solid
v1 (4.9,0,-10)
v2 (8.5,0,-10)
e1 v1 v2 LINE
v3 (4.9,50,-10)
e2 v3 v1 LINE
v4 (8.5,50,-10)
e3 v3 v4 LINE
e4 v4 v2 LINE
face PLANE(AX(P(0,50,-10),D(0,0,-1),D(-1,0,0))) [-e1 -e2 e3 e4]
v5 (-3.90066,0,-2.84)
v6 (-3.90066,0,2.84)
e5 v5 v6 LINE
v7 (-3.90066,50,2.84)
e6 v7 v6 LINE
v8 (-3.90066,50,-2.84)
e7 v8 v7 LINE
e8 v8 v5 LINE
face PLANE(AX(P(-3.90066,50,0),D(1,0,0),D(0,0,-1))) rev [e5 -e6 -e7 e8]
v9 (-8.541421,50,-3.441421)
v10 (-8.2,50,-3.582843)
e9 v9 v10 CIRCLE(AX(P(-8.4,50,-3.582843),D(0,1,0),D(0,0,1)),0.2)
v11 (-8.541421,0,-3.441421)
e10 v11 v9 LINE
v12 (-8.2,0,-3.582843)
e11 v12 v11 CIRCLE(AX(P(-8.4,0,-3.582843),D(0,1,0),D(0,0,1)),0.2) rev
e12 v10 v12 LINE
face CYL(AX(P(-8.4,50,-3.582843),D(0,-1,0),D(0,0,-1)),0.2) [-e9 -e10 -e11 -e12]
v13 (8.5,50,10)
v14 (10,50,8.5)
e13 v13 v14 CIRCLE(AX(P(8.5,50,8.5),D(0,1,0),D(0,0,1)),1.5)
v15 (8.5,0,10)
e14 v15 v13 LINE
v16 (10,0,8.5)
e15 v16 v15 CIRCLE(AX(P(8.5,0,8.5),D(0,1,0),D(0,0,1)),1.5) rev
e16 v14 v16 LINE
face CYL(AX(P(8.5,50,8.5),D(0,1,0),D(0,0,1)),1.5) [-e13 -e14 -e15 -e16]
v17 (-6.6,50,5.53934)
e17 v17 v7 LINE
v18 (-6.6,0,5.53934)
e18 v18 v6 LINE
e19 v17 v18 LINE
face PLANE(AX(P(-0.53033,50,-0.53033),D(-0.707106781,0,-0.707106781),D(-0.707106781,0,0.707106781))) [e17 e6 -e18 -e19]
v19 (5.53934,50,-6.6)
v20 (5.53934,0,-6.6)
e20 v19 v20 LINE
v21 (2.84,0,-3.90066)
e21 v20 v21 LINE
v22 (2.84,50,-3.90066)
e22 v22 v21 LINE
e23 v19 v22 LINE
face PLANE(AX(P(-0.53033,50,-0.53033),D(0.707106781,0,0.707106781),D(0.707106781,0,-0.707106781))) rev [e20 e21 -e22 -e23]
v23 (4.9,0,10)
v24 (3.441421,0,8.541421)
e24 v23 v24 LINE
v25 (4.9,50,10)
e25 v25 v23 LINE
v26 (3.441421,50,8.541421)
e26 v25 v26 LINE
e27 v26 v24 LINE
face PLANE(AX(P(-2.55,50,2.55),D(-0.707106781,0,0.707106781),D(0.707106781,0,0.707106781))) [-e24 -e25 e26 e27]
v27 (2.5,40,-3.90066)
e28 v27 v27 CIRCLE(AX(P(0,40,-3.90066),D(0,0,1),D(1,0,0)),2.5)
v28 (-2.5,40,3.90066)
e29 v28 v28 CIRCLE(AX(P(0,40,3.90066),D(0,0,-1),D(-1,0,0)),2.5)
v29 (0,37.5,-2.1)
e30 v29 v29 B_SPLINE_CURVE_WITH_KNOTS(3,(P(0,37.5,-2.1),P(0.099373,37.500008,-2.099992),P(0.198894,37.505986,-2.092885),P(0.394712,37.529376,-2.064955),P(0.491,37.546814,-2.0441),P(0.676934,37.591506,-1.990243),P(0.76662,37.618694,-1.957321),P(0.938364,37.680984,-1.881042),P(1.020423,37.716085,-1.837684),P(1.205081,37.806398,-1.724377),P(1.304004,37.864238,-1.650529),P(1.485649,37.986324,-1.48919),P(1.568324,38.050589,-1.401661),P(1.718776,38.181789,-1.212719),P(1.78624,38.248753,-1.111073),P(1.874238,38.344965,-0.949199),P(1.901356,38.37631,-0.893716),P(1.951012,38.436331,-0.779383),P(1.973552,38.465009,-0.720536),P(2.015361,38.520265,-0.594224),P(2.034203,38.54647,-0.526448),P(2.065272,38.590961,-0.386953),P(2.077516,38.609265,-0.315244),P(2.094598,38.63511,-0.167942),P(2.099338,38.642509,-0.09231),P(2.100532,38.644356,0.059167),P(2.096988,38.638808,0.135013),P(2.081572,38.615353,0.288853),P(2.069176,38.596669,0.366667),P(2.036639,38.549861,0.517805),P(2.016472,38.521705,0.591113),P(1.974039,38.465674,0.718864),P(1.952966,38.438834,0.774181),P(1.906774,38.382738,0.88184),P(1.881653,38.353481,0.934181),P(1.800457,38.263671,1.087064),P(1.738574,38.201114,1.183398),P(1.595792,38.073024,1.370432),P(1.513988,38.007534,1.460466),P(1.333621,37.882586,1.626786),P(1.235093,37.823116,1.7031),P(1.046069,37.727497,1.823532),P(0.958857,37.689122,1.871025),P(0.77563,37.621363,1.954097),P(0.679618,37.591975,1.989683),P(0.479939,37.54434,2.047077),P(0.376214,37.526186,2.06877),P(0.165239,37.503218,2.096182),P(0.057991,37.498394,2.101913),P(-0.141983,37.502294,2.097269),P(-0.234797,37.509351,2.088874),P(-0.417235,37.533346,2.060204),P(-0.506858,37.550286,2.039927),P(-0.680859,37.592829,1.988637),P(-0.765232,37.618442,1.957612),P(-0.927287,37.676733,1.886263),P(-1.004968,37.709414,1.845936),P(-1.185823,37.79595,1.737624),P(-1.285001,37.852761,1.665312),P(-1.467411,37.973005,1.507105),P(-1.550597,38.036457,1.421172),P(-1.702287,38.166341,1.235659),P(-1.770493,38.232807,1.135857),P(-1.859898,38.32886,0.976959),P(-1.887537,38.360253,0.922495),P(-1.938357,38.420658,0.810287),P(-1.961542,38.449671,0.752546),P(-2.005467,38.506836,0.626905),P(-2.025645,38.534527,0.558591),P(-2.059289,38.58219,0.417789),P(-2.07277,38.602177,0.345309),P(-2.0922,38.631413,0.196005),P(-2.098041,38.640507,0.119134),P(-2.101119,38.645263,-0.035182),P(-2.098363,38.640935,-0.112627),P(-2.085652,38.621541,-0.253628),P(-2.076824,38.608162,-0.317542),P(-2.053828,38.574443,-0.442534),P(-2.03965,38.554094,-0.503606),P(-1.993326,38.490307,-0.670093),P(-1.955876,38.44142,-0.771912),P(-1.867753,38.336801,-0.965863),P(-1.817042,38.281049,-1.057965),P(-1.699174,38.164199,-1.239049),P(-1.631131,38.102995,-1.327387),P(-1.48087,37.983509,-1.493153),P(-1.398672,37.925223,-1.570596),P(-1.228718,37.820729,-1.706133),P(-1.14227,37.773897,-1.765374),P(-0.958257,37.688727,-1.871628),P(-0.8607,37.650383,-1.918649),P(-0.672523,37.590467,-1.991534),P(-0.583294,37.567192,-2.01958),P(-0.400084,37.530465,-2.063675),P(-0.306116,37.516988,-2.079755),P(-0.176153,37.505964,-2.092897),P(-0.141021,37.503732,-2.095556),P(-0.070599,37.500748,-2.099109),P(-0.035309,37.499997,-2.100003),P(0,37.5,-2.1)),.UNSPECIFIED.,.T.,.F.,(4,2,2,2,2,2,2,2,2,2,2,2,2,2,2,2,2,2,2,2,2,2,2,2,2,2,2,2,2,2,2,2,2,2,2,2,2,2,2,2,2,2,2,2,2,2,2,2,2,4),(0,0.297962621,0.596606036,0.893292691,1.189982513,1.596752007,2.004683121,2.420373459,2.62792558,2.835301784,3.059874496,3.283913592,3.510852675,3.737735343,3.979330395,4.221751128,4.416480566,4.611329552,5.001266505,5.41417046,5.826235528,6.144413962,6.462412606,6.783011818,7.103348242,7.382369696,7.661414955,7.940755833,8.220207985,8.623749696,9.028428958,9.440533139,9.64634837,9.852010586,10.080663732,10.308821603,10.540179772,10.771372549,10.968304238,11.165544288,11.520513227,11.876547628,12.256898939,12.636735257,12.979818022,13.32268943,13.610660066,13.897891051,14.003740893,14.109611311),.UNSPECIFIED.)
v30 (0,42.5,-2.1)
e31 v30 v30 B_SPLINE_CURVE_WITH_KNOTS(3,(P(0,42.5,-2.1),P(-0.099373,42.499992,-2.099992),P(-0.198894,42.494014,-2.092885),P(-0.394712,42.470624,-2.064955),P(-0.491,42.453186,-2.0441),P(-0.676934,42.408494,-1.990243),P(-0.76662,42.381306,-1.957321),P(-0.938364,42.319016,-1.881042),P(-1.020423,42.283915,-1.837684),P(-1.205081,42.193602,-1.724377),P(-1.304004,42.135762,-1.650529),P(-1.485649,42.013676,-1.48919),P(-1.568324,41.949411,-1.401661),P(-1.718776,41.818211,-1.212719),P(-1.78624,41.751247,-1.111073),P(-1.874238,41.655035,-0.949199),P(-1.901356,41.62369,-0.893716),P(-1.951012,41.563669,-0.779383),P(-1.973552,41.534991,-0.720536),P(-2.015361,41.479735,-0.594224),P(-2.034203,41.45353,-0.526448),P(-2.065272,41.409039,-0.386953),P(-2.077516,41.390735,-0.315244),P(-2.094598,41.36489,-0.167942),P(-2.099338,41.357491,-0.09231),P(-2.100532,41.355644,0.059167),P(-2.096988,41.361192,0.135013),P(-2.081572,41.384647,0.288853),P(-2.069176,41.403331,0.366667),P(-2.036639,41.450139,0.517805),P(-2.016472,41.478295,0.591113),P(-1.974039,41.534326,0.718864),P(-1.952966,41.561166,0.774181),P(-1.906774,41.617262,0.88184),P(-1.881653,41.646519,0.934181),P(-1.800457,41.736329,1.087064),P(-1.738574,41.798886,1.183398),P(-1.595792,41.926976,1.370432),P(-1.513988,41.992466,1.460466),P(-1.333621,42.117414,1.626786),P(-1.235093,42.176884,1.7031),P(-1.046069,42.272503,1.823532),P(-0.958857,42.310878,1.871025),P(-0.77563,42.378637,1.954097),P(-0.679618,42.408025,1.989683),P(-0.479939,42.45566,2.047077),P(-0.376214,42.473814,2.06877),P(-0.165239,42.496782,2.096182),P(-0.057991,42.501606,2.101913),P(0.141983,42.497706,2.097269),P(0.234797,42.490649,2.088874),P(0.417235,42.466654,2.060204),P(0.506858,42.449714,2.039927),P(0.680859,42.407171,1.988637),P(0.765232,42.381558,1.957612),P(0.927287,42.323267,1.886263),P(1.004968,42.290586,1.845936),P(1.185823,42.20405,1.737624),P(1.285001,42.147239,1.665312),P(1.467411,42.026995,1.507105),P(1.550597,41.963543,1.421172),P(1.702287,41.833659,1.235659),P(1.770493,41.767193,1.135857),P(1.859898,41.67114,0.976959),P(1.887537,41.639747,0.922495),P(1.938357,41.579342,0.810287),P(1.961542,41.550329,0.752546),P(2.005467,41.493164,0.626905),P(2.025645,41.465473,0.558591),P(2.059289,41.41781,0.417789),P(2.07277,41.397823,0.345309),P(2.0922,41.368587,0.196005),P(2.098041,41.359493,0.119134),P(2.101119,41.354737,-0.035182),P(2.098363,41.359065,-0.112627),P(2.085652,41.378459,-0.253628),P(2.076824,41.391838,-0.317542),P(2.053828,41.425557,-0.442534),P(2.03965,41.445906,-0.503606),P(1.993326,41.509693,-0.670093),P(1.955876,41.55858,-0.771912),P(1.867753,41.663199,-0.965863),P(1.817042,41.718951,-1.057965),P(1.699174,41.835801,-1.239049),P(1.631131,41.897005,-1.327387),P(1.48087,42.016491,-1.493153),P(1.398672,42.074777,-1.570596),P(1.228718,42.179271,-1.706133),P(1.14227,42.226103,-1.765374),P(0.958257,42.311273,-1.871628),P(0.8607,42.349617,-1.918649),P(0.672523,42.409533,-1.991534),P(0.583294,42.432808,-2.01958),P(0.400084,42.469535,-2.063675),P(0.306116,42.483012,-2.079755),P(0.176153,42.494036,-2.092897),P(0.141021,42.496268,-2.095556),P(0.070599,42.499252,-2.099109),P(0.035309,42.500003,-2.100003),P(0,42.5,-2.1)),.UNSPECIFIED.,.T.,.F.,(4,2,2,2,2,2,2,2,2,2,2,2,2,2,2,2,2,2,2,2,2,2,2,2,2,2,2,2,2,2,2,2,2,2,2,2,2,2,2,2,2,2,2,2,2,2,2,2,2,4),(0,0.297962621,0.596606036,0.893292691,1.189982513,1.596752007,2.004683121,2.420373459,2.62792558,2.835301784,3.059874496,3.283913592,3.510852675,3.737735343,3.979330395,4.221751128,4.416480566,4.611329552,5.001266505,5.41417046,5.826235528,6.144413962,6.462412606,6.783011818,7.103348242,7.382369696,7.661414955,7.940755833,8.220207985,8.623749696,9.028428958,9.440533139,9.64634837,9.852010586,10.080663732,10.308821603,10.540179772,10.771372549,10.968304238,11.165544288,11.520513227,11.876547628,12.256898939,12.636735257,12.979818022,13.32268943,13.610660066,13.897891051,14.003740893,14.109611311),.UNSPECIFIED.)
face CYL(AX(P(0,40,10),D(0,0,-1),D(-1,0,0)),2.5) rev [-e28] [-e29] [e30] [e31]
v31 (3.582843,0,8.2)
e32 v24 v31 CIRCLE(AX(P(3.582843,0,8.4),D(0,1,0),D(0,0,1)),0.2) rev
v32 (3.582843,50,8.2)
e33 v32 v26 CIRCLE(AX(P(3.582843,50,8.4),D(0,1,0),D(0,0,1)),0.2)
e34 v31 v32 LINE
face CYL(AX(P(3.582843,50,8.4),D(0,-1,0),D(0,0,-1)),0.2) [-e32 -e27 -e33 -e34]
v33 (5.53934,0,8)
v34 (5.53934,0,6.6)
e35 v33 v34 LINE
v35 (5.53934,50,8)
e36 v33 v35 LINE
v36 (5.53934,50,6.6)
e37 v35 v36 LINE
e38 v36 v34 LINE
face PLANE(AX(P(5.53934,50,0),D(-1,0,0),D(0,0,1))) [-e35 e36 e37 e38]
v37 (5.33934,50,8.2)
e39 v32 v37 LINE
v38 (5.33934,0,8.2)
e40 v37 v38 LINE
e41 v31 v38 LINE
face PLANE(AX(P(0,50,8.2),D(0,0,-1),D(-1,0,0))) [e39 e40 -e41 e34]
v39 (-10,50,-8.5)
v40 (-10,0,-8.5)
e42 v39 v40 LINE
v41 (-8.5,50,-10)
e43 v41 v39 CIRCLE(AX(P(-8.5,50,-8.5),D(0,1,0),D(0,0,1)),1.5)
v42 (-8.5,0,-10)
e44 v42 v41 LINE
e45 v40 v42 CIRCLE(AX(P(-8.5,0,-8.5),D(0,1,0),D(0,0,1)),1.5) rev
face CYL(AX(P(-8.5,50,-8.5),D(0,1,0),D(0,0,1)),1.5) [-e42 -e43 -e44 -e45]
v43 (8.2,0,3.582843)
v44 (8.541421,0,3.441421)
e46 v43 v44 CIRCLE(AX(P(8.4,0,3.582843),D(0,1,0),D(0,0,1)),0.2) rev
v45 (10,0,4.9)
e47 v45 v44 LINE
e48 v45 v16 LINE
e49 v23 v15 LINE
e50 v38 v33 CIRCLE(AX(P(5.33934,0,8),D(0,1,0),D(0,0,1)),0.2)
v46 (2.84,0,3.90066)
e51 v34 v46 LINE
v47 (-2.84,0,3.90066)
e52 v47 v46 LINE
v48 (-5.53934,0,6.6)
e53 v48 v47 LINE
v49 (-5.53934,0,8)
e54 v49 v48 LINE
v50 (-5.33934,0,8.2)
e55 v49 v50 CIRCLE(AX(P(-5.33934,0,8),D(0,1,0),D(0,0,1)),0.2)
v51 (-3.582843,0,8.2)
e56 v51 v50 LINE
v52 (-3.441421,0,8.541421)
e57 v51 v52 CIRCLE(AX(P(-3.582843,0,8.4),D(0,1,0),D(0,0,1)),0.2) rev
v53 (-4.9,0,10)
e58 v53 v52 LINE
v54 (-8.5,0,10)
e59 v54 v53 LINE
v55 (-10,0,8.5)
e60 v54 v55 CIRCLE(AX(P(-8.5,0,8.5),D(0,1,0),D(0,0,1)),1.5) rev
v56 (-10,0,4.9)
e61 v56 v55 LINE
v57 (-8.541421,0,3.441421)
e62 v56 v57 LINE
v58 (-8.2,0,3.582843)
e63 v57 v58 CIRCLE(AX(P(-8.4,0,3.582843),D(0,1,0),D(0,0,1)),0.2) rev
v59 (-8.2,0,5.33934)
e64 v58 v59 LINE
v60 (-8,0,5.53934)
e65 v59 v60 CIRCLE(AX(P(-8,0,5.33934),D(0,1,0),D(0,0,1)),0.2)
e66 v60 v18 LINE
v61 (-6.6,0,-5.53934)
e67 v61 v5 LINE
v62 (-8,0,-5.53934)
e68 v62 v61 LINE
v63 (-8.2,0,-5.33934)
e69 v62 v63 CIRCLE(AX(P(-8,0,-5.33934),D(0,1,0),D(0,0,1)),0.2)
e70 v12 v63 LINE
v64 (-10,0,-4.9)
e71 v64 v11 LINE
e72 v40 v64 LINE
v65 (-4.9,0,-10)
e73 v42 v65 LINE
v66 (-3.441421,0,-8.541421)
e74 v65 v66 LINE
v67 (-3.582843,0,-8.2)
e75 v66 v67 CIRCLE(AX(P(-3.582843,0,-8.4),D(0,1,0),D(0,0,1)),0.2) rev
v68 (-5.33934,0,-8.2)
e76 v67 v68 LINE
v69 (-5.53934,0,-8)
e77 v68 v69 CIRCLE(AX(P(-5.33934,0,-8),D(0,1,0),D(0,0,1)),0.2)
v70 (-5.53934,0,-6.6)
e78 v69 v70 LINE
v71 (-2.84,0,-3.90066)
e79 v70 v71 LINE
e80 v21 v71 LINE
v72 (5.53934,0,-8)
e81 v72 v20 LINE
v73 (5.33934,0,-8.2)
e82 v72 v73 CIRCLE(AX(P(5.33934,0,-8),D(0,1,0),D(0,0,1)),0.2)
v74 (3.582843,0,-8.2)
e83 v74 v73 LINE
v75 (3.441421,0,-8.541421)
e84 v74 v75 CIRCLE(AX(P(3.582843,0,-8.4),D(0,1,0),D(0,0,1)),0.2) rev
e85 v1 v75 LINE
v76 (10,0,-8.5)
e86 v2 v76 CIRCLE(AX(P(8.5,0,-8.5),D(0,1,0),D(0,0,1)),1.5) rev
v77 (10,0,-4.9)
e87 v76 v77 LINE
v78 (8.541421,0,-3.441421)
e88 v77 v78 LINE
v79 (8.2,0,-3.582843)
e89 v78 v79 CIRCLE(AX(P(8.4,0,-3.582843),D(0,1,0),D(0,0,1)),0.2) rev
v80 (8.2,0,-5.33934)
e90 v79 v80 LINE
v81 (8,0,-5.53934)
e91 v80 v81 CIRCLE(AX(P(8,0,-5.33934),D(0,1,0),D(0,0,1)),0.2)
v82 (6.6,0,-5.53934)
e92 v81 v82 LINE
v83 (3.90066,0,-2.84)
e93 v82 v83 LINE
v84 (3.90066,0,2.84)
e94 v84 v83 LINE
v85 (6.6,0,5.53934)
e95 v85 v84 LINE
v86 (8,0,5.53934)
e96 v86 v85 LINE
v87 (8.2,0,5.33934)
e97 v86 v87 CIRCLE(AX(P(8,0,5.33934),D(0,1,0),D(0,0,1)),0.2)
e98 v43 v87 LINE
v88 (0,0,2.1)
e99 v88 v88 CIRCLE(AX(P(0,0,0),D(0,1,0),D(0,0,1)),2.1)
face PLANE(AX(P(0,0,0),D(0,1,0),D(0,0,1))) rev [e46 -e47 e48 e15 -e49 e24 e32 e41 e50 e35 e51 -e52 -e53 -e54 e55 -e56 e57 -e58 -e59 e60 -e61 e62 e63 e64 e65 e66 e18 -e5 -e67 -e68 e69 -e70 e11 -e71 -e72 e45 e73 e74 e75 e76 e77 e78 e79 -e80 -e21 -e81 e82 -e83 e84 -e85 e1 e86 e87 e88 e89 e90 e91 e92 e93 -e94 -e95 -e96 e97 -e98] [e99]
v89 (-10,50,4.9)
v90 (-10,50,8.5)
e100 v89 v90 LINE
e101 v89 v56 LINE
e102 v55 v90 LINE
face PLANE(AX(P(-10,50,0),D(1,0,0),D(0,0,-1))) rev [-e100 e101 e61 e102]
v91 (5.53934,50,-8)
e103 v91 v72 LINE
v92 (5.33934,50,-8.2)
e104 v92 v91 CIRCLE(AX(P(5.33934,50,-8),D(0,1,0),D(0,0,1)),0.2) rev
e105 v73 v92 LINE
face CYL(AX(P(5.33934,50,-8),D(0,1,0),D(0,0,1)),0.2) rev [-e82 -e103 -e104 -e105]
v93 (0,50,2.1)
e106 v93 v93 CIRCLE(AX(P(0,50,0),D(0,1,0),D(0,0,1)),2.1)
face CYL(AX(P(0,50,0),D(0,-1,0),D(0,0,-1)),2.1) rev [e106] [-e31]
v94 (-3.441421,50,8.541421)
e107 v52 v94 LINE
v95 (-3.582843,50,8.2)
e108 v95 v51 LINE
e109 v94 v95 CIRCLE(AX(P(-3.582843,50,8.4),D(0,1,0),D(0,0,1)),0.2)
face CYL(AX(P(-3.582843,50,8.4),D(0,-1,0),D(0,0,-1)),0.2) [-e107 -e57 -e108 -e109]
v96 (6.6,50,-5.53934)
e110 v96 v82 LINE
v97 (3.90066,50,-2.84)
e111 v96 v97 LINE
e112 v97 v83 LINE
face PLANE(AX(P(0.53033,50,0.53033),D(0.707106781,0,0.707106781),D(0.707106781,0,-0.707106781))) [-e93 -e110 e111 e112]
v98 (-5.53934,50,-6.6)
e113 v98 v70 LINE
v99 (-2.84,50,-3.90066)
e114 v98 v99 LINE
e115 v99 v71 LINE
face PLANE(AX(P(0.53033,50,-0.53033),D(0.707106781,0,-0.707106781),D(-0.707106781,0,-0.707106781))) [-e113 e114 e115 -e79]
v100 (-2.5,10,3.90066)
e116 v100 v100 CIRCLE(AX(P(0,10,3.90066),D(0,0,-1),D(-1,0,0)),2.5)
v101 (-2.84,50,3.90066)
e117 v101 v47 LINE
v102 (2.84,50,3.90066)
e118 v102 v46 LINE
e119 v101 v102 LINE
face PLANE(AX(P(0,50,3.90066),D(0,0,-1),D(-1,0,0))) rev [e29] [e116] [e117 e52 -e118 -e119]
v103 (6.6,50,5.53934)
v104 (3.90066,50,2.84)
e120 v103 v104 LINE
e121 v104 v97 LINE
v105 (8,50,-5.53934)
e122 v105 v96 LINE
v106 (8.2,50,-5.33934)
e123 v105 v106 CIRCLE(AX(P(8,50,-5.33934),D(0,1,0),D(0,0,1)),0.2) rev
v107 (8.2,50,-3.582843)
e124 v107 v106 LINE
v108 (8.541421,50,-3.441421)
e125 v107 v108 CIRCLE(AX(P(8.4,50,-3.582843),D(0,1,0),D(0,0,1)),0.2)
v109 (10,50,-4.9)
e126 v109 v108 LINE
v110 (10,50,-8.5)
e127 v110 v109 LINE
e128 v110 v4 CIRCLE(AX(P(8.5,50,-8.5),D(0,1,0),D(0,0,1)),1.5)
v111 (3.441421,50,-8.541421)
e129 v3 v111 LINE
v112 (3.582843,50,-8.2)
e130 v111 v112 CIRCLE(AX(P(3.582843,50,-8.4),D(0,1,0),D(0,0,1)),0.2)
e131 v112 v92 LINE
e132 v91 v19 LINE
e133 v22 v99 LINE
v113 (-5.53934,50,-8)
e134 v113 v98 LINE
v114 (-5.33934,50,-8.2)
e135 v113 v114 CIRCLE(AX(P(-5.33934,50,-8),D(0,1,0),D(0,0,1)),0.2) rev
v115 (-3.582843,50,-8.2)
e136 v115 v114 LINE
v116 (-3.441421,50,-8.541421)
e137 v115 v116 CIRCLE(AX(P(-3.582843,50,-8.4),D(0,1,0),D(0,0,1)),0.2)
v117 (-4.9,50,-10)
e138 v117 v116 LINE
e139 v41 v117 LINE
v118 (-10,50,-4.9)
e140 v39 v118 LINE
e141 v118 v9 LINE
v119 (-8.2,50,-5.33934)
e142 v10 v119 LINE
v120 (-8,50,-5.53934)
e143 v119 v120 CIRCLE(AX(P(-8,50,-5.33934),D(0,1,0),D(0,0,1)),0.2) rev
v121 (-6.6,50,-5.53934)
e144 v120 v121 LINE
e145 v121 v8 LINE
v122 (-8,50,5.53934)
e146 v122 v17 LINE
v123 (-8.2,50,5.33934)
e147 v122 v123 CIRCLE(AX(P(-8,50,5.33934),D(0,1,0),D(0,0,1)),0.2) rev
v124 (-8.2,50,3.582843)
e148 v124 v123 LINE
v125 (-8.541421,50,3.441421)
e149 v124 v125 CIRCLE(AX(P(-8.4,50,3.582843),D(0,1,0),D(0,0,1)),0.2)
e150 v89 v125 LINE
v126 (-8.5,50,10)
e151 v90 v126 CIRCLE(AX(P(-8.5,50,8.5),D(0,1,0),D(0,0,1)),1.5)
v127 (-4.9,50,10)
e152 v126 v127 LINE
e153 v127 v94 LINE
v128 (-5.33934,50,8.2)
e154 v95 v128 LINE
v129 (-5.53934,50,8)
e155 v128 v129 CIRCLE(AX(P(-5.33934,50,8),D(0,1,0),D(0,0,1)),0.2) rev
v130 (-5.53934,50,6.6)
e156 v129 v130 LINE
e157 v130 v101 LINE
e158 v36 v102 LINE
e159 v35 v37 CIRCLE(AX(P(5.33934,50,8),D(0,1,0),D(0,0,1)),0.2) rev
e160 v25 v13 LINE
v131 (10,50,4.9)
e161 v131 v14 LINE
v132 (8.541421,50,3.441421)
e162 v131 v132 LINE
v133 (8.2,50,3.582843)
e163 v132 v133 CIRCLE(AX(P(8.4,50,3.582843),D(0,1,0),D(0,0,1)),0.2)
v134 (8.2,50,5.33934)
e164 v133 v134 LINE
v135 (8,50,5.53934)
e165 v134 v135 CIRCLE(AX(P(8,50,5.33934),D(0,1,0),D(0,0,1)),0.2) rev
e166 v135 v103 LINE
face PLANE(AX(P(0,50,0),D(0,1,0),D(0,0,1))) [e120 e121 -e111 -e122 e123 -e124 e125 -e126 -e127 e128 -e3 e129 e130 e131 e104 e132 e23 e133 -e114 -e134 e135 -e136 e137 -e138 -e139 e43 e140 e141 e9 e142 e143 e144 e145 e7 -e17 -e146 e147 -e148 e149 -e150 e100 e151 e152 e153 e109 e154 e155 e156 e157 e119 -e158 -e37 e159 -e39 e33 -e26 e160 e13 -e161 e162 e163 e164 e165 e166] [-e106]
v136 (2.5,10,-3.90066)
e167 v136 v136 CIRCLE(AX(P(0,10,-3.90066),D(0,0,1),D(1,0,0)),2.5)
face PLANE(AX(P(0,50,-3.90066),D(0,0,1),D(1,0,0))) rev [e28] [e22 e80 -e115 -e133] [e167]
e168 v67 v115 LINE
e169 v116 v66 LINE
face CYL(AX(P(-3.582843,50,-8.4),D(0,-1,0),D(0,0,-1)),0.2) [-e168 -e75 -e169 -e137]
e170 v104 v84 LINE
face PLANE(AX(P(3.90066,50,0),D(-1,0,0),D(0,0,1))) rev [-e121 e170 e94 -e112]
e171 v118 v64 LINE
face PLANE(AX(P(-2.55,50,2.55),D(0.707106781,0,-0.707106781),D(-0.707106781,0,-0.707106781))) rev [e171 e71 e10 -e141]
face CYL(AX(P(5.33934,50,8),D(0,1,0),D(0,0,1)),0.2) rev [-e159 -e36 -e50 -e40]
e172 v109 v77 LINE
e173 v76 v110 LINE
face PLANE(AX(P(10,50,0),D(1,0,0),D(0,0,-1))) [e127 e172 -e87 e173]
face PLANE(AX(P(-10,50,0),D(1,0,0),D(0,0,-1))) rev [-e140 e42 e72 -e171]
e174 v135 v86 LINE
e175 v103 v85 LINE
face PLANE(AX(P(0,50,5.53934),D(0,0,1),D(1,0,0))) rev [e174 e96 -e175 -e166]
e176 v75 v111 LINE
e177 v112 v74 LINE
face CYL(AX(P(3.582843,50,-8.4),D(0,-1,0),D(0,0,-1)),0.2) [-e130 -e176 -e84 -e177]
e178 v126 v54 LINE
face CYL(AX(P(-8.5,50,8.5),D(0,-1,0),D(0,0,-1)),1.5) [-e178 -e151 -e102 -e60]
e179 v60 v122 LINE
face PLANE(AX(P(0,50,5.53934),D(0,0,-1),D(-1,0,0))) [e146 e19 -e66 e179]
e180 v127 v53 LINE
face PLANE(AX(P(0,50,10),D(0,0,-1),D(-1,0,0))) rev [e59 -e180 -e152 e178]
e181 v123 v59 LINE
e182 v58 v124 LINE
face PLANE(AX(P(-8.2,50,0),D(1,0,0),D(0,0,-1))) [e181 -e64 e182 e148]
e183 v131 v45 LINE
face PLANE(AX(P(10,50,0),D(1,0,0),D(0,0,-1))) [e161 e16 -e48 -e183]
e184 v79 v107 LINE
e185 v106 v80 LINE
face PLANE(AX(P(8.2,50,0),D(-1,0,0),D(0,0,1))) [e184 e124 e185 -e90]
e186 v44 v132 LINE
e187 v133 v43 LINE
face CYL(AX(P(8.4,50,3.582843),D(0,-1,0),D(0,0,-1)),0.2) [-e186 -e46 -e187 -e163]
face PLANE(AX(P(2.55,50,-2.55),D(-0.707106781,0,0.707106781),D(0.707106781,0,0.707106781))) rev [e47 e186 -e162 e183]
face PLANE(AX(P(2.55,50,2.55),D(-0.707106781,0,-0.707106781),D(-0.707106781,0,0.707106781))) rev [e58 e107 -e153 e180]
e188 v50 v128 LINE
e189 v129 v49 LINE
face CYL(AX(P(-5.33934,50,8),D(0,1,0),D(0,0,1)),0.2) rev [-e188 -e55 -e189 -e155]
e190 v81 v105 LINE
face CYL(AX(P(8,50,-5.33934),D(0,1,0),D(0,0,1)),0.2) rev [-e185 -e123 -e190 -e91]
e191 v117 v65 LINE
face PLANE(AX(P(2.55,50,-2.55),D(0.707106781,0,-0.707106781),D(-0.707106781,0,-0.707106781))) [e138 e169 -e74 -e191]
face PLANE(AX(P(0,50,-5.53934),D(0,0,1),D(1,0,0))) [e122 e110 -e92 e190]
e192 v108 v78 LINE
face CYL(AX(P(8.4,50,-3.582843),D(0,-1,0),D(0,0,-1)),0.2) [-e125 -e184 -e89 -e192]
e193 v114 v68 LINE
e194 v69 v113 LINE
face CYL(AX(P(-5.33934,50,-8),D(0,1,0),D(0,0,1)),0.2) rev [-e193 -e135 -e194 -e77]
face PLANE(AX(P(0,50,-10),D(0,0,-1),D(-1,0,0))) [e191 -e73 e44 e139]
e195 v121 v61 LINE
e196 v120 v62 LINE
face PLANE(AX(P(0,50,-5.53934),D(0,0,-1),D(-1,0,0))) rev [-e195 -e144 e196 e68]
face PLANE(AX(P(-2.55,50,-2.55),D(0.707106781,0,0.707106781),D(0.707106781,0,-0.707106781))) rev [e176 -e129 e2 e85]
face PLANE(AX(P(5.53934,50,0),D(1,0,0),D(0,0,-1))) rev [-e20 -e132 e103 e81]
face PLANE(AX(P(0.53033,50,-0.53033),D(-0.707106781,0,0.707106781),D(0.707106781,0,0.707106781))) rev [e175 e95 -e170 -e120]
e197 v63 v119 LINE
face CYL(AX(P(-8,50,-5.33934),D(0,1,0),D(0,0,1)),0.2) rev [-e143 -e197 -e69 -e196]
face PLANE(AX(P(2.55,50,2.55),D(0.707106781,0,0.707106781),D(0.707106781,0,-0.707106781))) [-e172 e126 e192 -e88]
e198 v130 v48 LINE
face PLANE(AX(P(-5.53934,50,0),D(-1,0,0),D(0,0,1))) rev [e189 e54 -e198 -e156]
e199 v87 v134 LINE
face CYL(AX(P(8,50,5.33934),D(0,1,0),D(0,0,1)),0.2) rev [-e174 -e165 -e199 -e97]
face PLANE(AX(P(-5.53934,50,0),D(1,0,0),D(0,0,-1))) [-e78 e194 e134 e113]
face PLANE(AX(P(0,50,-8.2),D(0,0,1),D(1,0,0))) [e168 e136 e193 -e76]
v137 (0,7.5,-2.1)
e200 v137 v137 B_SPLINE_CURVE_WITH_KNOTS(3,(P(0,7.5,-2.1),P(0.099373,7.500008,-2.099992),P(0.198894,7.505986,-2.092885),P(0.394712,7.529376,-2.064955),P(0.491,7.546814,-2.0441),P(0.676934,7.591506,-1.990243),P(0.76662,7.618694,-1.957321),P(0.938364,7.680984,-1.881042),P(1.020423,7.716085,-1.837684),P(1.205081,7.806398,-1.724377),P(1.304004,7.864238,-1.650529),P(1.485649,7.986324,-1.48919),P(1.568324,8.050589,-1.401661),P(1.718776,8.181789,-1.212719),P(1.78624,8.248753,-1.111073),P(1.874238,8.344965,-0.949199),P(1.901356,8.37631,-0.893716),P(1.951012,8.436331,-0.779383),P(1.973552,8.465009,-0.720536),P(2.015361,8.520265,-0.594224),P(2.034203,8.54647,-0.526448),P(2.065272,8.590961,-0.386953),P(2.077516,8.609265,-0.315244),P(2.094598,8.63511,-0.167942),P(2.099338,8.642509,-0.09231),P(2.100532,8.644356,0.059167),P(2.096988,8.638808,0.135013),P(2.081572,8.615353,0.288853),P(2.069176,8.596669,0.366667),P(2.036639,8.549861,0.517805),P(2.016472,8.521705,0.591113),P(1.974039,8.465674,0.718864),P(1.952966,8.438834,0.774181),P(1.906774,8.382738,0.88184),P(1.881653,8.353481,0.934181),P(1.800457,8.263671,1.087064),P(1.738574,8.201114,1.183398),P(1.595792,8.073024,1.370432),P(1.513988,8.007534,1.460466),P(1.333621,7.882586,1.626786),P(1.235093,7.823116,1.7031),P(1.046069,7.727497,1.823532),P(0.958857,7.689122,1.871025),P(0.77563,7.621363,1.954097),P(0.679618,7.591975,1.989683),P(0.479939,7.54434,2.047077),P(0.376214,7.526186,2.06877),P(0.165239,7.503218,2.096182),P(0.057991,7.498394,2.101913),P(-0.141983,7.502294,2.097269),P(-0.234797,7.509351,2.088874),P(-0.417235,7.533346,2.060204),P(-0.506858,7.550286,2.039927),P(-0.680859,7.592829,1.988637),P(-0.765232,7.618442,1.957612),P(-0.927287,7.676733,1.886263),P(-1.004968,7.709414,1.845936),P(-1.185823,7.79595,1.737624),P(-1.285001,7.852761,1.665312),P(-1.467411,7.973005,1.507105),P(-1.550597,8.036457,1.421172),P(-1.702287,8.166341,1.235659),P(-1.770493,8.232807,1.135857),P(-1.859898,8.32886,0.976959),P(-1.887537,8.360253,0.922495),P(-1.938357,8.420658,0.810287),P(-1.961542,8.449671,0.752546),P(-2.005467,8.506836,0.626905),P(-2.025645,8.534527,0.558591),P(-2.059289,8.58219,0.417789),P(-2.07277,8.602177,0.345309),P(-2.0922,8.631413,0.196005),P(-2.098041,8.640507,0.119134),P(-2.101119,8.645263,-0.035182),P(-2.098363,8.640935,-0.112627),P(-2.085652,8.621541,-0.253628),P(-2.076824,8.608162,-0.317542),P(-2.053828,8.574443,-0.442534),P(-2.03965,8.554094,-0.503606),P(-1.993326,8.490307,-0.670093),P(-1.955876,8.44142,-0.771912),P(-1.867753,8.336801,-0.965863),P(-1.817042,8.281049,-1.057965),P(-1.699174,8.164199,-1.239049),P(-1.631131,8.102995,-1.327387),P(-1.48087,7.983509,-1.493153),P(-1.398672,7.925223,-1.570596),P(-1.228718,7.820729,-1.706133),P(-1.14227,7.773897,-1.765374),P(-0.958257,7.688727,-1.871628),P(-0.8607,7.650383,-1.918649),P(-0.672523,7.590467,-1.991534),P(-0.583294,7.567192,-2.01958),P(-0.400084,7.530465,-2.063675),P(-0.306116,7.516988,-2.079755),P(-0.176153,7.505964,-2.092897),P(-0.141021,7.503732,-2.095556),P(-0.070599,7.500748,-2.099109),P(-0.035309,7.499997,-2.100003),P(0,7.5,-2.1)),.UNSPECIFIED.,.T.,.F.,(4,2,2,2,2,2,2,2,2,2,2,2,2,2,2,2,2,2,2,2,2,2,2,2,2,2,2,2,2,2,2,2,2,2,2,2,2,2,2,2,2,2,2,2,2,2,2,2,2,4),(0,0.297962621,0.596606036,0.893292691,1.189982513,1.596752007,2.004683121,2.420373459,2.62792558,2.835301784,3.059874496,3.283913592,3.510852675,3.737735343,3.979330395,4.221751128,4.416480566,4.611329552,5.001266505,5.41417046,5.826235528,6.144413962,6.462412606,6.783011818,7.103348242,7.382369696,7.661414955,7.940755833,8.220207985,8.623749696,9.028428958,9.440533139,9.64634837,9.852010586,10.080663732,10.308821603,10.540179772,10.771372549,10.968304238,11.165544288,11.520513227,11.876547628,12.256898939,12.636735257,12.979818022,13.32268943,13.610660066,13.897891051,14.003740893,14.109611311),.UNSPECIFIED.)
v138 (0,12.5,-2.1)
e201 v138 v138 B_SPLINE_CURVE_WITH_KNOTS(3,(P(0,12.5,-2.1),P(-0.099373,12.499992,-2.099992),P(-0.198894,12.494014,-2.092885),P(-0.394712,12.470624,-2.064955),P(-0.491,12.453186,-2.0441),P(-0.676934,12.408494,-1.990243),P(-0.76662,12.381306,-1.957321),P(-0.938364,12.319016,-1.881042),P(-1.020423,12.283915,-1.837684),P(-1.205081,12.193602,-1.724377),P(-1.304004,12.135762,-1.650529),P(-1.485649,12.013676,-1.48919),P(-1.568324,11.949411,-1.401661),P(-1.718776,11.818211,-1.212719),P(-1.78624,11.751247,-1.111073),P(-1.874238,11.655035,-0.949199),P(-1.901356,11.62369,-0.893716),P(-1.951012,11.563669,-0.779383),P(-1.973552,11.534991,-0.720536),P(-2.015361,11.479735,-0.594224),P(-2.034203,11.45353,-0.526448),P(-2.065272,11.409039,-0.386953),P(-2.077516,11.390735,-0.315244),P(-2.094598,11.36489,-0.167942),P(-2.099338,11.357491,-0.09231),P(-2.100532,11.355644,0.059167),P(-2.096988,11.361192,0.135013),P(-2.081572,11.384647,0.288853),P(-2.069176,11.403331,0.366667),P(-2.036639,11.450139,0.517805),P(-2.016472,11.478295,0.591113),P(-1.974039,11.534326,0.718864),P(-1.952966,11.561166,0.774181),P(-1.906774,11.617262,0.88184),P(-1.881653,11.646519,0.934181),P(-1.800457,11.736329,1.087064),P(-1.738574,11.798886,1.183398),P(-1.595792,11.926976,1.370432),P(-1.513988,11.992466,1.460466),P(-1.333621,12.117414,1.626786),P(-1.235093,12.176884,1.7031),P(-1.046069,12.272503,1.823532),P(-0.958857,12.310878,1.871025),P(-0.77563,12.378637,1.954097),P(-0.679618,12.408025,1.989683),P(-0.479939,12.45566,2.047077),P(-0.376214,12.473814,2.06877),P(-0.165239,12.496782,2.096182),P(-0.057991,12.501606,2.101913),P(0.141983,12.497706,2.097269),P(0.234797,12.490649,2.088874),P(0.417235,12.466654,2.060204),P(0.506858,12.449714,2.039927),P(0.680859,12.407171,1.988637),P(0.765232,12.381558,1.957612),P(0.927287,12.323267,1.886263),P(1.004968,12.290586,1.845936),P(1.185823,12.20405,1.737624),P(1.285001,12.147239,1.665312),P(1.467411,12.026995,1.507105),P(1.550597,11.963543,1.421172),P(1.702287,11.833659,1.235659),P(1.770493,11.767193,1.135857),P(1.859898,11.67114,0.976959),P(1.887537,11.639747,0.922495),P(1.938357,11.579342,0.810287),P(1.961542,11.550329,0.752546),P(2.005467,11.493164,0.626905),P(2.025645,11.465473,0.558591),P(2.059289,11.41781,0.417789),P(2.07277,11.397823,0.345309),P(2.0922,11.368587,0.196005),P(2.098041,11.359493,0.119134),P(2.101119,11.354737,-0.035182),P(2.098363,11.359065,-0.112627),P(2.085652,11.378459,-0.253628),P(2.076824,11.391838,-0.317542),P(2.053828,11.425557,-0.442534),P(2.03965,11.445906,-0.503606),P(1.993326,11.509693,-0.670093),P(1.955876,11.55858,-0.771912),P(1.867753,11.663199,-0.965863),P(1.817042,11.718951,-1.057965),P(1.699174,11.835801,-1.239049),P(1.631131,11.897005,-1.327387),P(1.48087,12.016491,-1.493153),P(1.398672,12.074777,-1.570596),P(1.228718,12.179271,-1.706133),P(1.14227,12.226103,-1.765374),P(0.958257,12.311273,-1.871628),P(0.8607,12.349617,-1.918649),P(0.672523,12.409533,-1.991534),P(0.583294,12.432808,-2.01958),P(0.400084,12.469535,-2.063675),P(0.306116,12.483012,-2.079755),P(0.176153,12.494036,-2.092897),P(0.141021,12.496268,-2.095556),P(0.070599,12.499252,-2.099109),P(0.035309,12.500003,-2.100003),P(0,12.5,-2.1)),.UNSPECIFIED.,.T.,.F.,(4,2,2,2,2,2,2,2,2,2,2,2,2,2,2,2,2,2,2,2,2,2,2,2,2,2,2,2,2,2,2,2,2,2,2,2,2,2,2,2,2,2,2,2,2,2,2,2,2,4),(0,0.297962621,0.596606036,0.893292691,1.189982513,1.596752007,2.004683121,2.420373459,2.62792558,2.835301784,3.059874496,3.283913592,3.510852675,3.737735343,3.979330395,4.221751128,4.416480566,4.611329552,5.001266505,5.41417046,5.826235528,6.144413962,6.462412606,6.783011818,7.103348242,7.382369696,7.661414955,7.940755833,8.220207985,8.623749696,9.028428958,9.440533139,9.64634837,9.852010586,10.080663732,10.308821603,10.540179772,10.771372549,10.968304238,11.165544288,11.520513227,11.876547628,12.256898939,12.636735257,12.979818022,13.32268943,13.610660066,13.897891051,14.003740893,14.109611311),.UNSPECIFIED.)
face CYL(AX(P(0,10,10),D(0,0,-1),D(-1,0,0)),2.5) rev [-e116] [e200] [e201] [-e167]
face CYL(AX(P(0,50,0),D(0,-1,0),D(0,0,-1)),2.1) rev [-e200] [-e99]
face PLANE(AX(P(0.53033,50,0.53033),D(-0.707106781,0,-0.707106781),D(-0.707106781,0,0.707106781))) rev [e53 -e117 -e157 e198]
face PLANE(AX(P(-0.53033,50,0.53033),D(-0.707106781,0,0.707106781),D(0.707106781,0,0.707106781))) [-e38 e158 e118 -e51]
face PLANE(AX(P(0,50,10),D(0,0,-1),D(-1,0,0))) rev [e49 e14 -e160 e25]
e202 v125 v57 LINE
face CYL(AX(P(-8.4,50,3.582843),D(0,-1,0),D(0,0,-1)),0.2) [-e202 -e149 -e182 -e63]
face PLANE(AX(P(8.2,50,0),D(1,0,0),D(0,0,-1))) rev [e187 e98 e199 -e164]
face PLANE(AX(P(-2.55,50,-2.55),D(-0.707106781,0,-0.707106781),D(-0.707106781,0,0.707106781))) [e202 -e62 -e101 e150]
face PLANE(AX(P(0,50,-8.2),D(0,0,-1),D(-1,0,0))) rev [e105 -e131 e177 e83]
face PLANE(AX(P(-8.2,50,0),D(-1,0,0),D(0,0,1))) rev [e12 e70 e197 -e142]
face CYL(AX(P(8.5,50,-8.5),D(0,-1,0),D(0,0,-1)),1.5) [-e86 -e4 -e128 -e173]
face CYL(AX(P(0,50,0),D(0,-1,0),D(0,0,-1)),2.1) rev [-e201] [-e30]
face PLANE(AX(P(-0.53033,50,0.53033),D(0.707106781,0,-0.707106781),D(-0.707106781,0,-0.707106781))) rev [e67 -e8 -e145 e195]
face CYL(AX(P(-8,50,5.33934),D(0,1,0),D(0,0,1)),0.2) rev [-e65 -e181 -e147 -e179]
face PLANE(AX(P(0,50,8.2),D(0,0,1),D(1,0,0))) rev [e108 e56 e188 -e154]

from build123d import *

# Parameters (mm, degrees)
SALIENTE_EXTRUIR1_OUTLINE_R = 2.1
SALIENTE_EXTRUIR1_DEPTH     = 50
REDONDEO1_R                 = 1.5
REDONDEO2_R                 = 0.2
CROQUIS2_R                  = 2.5
CORTAR_EXTRUIR1_DEPTH       = 55.772255751


# Read off the part's stored shape, not the designer's step: Saliente-Extruir1
with BuildPart() as part:
    # Saliente-Extruir1 outline → Saliente-Extruir1 (new body)
    with BuildSketch(Plane(origin=(0, 0, 0), x_dir=(1, 0, 0), z_dir=(0, 1, 0))):
        Polygon((-5.539339828, -6.6), (-2.84, -3.900660172), (2.84, -3.900660172), (5.539339828, -6.6), (5.539339828, -8.2), (3.1, -8.2), (4.9, -10), (10, -10), (10, -4.9), (8.2, -3.1), (8.2, -5.539339828), (6.6, -5.539339828), (3.900660172, -2.84), (3.900660172, 2.84), (6.6, 5.539339828), (8.2, 5.539339828), (8.2, 3.1), (10, 4.9), (10, 10), (4.9, 10), (3.1, 8.2), (5.539339828, 8.2), (5.539339828, 6.6), (2.84, 3.900660172), (-2.84, 3.900660172), (-5.539339828, 6.6), (-5.539339828, 8.2), (-3.1, 8.2), (-4.9, 10), (-10, 10), (-10, 4.9), (-8.2, 3.1), (-8.2, 5.539339828), (-6.6, 5.539339828), (-3.900660172, 2.84), (-3.900660172, -2.84), (-6.6, -5.539339828), (-8.2, -5.539339828), (-8.2, -3.1), (-10, -4.9), (-10, -10), (-4.9, -10), (-3.1, -8.2), (-5.539339828, -8.2), align=None)
        Circle(SALIENTE_EXTRUIR1_OUTLINE_R, mode=Mode.SUBTRACT)
    extrude(amount=SALIENTE_EXTRUIR1_DEPTH)

    # Redondeo1
    redondeo1_edges = [part.edges().sort_by_distance(p)[0] for p in [
        (-10, 25, 10),
        (-10, 25, -10),
        (10, 25, -10),
        (10, 25, 10),
    ]]
    fillet(redondeo1_edges, radius=REDONDEO1_R)

    # Redondeo2
    redondeo2_edges = [part.edges().sort_by_distance(p)[0] for p in [
        (-5.539339828, 25, 8.2),
        (-3.1, 25, 8.2),
        (-8.2, 25, 3.1),
        (-8.2, 25, 5.539339828),
        (-8.2, 25, -5.539339828),
        (-8.2, 25, -3.1),
        (-3.1, 25, -8.2),
        (-5.539339828, 25, -8.2),
        (5.539339828, 25, -8.2),
        (3.1, 25, -8.2),
        (8.2, 25, -3.1),
        (8.2, 25, -5.539339828),
        (8.2, 25, 5.539339828),
        (8.2, 25, 3.1),
        (3.1, 25, 8.2),
        (5.539339828, 25, 8.2),
    ]]
    fillet(redondeo2_edges, radius=REDONDEO2_R)

    # Croquis2 → Cortar-Extruir1 (cut, through all)
    with BuildSketch(Plane(origin=(0, 0, -10), x_dir=(-1, 0, 0), z_dir=(0, 0, -1))):
        with Locations((0, 40)):
            Circle(CROQUIS2_R)
        with Locations((0, 10)):
            Circle(CROQUIS2_R)
    extrude(amount=-CORTAR_EXTRUIR1_DEPTH, mode=Mode.SUBTRACT)


solid = part.part
